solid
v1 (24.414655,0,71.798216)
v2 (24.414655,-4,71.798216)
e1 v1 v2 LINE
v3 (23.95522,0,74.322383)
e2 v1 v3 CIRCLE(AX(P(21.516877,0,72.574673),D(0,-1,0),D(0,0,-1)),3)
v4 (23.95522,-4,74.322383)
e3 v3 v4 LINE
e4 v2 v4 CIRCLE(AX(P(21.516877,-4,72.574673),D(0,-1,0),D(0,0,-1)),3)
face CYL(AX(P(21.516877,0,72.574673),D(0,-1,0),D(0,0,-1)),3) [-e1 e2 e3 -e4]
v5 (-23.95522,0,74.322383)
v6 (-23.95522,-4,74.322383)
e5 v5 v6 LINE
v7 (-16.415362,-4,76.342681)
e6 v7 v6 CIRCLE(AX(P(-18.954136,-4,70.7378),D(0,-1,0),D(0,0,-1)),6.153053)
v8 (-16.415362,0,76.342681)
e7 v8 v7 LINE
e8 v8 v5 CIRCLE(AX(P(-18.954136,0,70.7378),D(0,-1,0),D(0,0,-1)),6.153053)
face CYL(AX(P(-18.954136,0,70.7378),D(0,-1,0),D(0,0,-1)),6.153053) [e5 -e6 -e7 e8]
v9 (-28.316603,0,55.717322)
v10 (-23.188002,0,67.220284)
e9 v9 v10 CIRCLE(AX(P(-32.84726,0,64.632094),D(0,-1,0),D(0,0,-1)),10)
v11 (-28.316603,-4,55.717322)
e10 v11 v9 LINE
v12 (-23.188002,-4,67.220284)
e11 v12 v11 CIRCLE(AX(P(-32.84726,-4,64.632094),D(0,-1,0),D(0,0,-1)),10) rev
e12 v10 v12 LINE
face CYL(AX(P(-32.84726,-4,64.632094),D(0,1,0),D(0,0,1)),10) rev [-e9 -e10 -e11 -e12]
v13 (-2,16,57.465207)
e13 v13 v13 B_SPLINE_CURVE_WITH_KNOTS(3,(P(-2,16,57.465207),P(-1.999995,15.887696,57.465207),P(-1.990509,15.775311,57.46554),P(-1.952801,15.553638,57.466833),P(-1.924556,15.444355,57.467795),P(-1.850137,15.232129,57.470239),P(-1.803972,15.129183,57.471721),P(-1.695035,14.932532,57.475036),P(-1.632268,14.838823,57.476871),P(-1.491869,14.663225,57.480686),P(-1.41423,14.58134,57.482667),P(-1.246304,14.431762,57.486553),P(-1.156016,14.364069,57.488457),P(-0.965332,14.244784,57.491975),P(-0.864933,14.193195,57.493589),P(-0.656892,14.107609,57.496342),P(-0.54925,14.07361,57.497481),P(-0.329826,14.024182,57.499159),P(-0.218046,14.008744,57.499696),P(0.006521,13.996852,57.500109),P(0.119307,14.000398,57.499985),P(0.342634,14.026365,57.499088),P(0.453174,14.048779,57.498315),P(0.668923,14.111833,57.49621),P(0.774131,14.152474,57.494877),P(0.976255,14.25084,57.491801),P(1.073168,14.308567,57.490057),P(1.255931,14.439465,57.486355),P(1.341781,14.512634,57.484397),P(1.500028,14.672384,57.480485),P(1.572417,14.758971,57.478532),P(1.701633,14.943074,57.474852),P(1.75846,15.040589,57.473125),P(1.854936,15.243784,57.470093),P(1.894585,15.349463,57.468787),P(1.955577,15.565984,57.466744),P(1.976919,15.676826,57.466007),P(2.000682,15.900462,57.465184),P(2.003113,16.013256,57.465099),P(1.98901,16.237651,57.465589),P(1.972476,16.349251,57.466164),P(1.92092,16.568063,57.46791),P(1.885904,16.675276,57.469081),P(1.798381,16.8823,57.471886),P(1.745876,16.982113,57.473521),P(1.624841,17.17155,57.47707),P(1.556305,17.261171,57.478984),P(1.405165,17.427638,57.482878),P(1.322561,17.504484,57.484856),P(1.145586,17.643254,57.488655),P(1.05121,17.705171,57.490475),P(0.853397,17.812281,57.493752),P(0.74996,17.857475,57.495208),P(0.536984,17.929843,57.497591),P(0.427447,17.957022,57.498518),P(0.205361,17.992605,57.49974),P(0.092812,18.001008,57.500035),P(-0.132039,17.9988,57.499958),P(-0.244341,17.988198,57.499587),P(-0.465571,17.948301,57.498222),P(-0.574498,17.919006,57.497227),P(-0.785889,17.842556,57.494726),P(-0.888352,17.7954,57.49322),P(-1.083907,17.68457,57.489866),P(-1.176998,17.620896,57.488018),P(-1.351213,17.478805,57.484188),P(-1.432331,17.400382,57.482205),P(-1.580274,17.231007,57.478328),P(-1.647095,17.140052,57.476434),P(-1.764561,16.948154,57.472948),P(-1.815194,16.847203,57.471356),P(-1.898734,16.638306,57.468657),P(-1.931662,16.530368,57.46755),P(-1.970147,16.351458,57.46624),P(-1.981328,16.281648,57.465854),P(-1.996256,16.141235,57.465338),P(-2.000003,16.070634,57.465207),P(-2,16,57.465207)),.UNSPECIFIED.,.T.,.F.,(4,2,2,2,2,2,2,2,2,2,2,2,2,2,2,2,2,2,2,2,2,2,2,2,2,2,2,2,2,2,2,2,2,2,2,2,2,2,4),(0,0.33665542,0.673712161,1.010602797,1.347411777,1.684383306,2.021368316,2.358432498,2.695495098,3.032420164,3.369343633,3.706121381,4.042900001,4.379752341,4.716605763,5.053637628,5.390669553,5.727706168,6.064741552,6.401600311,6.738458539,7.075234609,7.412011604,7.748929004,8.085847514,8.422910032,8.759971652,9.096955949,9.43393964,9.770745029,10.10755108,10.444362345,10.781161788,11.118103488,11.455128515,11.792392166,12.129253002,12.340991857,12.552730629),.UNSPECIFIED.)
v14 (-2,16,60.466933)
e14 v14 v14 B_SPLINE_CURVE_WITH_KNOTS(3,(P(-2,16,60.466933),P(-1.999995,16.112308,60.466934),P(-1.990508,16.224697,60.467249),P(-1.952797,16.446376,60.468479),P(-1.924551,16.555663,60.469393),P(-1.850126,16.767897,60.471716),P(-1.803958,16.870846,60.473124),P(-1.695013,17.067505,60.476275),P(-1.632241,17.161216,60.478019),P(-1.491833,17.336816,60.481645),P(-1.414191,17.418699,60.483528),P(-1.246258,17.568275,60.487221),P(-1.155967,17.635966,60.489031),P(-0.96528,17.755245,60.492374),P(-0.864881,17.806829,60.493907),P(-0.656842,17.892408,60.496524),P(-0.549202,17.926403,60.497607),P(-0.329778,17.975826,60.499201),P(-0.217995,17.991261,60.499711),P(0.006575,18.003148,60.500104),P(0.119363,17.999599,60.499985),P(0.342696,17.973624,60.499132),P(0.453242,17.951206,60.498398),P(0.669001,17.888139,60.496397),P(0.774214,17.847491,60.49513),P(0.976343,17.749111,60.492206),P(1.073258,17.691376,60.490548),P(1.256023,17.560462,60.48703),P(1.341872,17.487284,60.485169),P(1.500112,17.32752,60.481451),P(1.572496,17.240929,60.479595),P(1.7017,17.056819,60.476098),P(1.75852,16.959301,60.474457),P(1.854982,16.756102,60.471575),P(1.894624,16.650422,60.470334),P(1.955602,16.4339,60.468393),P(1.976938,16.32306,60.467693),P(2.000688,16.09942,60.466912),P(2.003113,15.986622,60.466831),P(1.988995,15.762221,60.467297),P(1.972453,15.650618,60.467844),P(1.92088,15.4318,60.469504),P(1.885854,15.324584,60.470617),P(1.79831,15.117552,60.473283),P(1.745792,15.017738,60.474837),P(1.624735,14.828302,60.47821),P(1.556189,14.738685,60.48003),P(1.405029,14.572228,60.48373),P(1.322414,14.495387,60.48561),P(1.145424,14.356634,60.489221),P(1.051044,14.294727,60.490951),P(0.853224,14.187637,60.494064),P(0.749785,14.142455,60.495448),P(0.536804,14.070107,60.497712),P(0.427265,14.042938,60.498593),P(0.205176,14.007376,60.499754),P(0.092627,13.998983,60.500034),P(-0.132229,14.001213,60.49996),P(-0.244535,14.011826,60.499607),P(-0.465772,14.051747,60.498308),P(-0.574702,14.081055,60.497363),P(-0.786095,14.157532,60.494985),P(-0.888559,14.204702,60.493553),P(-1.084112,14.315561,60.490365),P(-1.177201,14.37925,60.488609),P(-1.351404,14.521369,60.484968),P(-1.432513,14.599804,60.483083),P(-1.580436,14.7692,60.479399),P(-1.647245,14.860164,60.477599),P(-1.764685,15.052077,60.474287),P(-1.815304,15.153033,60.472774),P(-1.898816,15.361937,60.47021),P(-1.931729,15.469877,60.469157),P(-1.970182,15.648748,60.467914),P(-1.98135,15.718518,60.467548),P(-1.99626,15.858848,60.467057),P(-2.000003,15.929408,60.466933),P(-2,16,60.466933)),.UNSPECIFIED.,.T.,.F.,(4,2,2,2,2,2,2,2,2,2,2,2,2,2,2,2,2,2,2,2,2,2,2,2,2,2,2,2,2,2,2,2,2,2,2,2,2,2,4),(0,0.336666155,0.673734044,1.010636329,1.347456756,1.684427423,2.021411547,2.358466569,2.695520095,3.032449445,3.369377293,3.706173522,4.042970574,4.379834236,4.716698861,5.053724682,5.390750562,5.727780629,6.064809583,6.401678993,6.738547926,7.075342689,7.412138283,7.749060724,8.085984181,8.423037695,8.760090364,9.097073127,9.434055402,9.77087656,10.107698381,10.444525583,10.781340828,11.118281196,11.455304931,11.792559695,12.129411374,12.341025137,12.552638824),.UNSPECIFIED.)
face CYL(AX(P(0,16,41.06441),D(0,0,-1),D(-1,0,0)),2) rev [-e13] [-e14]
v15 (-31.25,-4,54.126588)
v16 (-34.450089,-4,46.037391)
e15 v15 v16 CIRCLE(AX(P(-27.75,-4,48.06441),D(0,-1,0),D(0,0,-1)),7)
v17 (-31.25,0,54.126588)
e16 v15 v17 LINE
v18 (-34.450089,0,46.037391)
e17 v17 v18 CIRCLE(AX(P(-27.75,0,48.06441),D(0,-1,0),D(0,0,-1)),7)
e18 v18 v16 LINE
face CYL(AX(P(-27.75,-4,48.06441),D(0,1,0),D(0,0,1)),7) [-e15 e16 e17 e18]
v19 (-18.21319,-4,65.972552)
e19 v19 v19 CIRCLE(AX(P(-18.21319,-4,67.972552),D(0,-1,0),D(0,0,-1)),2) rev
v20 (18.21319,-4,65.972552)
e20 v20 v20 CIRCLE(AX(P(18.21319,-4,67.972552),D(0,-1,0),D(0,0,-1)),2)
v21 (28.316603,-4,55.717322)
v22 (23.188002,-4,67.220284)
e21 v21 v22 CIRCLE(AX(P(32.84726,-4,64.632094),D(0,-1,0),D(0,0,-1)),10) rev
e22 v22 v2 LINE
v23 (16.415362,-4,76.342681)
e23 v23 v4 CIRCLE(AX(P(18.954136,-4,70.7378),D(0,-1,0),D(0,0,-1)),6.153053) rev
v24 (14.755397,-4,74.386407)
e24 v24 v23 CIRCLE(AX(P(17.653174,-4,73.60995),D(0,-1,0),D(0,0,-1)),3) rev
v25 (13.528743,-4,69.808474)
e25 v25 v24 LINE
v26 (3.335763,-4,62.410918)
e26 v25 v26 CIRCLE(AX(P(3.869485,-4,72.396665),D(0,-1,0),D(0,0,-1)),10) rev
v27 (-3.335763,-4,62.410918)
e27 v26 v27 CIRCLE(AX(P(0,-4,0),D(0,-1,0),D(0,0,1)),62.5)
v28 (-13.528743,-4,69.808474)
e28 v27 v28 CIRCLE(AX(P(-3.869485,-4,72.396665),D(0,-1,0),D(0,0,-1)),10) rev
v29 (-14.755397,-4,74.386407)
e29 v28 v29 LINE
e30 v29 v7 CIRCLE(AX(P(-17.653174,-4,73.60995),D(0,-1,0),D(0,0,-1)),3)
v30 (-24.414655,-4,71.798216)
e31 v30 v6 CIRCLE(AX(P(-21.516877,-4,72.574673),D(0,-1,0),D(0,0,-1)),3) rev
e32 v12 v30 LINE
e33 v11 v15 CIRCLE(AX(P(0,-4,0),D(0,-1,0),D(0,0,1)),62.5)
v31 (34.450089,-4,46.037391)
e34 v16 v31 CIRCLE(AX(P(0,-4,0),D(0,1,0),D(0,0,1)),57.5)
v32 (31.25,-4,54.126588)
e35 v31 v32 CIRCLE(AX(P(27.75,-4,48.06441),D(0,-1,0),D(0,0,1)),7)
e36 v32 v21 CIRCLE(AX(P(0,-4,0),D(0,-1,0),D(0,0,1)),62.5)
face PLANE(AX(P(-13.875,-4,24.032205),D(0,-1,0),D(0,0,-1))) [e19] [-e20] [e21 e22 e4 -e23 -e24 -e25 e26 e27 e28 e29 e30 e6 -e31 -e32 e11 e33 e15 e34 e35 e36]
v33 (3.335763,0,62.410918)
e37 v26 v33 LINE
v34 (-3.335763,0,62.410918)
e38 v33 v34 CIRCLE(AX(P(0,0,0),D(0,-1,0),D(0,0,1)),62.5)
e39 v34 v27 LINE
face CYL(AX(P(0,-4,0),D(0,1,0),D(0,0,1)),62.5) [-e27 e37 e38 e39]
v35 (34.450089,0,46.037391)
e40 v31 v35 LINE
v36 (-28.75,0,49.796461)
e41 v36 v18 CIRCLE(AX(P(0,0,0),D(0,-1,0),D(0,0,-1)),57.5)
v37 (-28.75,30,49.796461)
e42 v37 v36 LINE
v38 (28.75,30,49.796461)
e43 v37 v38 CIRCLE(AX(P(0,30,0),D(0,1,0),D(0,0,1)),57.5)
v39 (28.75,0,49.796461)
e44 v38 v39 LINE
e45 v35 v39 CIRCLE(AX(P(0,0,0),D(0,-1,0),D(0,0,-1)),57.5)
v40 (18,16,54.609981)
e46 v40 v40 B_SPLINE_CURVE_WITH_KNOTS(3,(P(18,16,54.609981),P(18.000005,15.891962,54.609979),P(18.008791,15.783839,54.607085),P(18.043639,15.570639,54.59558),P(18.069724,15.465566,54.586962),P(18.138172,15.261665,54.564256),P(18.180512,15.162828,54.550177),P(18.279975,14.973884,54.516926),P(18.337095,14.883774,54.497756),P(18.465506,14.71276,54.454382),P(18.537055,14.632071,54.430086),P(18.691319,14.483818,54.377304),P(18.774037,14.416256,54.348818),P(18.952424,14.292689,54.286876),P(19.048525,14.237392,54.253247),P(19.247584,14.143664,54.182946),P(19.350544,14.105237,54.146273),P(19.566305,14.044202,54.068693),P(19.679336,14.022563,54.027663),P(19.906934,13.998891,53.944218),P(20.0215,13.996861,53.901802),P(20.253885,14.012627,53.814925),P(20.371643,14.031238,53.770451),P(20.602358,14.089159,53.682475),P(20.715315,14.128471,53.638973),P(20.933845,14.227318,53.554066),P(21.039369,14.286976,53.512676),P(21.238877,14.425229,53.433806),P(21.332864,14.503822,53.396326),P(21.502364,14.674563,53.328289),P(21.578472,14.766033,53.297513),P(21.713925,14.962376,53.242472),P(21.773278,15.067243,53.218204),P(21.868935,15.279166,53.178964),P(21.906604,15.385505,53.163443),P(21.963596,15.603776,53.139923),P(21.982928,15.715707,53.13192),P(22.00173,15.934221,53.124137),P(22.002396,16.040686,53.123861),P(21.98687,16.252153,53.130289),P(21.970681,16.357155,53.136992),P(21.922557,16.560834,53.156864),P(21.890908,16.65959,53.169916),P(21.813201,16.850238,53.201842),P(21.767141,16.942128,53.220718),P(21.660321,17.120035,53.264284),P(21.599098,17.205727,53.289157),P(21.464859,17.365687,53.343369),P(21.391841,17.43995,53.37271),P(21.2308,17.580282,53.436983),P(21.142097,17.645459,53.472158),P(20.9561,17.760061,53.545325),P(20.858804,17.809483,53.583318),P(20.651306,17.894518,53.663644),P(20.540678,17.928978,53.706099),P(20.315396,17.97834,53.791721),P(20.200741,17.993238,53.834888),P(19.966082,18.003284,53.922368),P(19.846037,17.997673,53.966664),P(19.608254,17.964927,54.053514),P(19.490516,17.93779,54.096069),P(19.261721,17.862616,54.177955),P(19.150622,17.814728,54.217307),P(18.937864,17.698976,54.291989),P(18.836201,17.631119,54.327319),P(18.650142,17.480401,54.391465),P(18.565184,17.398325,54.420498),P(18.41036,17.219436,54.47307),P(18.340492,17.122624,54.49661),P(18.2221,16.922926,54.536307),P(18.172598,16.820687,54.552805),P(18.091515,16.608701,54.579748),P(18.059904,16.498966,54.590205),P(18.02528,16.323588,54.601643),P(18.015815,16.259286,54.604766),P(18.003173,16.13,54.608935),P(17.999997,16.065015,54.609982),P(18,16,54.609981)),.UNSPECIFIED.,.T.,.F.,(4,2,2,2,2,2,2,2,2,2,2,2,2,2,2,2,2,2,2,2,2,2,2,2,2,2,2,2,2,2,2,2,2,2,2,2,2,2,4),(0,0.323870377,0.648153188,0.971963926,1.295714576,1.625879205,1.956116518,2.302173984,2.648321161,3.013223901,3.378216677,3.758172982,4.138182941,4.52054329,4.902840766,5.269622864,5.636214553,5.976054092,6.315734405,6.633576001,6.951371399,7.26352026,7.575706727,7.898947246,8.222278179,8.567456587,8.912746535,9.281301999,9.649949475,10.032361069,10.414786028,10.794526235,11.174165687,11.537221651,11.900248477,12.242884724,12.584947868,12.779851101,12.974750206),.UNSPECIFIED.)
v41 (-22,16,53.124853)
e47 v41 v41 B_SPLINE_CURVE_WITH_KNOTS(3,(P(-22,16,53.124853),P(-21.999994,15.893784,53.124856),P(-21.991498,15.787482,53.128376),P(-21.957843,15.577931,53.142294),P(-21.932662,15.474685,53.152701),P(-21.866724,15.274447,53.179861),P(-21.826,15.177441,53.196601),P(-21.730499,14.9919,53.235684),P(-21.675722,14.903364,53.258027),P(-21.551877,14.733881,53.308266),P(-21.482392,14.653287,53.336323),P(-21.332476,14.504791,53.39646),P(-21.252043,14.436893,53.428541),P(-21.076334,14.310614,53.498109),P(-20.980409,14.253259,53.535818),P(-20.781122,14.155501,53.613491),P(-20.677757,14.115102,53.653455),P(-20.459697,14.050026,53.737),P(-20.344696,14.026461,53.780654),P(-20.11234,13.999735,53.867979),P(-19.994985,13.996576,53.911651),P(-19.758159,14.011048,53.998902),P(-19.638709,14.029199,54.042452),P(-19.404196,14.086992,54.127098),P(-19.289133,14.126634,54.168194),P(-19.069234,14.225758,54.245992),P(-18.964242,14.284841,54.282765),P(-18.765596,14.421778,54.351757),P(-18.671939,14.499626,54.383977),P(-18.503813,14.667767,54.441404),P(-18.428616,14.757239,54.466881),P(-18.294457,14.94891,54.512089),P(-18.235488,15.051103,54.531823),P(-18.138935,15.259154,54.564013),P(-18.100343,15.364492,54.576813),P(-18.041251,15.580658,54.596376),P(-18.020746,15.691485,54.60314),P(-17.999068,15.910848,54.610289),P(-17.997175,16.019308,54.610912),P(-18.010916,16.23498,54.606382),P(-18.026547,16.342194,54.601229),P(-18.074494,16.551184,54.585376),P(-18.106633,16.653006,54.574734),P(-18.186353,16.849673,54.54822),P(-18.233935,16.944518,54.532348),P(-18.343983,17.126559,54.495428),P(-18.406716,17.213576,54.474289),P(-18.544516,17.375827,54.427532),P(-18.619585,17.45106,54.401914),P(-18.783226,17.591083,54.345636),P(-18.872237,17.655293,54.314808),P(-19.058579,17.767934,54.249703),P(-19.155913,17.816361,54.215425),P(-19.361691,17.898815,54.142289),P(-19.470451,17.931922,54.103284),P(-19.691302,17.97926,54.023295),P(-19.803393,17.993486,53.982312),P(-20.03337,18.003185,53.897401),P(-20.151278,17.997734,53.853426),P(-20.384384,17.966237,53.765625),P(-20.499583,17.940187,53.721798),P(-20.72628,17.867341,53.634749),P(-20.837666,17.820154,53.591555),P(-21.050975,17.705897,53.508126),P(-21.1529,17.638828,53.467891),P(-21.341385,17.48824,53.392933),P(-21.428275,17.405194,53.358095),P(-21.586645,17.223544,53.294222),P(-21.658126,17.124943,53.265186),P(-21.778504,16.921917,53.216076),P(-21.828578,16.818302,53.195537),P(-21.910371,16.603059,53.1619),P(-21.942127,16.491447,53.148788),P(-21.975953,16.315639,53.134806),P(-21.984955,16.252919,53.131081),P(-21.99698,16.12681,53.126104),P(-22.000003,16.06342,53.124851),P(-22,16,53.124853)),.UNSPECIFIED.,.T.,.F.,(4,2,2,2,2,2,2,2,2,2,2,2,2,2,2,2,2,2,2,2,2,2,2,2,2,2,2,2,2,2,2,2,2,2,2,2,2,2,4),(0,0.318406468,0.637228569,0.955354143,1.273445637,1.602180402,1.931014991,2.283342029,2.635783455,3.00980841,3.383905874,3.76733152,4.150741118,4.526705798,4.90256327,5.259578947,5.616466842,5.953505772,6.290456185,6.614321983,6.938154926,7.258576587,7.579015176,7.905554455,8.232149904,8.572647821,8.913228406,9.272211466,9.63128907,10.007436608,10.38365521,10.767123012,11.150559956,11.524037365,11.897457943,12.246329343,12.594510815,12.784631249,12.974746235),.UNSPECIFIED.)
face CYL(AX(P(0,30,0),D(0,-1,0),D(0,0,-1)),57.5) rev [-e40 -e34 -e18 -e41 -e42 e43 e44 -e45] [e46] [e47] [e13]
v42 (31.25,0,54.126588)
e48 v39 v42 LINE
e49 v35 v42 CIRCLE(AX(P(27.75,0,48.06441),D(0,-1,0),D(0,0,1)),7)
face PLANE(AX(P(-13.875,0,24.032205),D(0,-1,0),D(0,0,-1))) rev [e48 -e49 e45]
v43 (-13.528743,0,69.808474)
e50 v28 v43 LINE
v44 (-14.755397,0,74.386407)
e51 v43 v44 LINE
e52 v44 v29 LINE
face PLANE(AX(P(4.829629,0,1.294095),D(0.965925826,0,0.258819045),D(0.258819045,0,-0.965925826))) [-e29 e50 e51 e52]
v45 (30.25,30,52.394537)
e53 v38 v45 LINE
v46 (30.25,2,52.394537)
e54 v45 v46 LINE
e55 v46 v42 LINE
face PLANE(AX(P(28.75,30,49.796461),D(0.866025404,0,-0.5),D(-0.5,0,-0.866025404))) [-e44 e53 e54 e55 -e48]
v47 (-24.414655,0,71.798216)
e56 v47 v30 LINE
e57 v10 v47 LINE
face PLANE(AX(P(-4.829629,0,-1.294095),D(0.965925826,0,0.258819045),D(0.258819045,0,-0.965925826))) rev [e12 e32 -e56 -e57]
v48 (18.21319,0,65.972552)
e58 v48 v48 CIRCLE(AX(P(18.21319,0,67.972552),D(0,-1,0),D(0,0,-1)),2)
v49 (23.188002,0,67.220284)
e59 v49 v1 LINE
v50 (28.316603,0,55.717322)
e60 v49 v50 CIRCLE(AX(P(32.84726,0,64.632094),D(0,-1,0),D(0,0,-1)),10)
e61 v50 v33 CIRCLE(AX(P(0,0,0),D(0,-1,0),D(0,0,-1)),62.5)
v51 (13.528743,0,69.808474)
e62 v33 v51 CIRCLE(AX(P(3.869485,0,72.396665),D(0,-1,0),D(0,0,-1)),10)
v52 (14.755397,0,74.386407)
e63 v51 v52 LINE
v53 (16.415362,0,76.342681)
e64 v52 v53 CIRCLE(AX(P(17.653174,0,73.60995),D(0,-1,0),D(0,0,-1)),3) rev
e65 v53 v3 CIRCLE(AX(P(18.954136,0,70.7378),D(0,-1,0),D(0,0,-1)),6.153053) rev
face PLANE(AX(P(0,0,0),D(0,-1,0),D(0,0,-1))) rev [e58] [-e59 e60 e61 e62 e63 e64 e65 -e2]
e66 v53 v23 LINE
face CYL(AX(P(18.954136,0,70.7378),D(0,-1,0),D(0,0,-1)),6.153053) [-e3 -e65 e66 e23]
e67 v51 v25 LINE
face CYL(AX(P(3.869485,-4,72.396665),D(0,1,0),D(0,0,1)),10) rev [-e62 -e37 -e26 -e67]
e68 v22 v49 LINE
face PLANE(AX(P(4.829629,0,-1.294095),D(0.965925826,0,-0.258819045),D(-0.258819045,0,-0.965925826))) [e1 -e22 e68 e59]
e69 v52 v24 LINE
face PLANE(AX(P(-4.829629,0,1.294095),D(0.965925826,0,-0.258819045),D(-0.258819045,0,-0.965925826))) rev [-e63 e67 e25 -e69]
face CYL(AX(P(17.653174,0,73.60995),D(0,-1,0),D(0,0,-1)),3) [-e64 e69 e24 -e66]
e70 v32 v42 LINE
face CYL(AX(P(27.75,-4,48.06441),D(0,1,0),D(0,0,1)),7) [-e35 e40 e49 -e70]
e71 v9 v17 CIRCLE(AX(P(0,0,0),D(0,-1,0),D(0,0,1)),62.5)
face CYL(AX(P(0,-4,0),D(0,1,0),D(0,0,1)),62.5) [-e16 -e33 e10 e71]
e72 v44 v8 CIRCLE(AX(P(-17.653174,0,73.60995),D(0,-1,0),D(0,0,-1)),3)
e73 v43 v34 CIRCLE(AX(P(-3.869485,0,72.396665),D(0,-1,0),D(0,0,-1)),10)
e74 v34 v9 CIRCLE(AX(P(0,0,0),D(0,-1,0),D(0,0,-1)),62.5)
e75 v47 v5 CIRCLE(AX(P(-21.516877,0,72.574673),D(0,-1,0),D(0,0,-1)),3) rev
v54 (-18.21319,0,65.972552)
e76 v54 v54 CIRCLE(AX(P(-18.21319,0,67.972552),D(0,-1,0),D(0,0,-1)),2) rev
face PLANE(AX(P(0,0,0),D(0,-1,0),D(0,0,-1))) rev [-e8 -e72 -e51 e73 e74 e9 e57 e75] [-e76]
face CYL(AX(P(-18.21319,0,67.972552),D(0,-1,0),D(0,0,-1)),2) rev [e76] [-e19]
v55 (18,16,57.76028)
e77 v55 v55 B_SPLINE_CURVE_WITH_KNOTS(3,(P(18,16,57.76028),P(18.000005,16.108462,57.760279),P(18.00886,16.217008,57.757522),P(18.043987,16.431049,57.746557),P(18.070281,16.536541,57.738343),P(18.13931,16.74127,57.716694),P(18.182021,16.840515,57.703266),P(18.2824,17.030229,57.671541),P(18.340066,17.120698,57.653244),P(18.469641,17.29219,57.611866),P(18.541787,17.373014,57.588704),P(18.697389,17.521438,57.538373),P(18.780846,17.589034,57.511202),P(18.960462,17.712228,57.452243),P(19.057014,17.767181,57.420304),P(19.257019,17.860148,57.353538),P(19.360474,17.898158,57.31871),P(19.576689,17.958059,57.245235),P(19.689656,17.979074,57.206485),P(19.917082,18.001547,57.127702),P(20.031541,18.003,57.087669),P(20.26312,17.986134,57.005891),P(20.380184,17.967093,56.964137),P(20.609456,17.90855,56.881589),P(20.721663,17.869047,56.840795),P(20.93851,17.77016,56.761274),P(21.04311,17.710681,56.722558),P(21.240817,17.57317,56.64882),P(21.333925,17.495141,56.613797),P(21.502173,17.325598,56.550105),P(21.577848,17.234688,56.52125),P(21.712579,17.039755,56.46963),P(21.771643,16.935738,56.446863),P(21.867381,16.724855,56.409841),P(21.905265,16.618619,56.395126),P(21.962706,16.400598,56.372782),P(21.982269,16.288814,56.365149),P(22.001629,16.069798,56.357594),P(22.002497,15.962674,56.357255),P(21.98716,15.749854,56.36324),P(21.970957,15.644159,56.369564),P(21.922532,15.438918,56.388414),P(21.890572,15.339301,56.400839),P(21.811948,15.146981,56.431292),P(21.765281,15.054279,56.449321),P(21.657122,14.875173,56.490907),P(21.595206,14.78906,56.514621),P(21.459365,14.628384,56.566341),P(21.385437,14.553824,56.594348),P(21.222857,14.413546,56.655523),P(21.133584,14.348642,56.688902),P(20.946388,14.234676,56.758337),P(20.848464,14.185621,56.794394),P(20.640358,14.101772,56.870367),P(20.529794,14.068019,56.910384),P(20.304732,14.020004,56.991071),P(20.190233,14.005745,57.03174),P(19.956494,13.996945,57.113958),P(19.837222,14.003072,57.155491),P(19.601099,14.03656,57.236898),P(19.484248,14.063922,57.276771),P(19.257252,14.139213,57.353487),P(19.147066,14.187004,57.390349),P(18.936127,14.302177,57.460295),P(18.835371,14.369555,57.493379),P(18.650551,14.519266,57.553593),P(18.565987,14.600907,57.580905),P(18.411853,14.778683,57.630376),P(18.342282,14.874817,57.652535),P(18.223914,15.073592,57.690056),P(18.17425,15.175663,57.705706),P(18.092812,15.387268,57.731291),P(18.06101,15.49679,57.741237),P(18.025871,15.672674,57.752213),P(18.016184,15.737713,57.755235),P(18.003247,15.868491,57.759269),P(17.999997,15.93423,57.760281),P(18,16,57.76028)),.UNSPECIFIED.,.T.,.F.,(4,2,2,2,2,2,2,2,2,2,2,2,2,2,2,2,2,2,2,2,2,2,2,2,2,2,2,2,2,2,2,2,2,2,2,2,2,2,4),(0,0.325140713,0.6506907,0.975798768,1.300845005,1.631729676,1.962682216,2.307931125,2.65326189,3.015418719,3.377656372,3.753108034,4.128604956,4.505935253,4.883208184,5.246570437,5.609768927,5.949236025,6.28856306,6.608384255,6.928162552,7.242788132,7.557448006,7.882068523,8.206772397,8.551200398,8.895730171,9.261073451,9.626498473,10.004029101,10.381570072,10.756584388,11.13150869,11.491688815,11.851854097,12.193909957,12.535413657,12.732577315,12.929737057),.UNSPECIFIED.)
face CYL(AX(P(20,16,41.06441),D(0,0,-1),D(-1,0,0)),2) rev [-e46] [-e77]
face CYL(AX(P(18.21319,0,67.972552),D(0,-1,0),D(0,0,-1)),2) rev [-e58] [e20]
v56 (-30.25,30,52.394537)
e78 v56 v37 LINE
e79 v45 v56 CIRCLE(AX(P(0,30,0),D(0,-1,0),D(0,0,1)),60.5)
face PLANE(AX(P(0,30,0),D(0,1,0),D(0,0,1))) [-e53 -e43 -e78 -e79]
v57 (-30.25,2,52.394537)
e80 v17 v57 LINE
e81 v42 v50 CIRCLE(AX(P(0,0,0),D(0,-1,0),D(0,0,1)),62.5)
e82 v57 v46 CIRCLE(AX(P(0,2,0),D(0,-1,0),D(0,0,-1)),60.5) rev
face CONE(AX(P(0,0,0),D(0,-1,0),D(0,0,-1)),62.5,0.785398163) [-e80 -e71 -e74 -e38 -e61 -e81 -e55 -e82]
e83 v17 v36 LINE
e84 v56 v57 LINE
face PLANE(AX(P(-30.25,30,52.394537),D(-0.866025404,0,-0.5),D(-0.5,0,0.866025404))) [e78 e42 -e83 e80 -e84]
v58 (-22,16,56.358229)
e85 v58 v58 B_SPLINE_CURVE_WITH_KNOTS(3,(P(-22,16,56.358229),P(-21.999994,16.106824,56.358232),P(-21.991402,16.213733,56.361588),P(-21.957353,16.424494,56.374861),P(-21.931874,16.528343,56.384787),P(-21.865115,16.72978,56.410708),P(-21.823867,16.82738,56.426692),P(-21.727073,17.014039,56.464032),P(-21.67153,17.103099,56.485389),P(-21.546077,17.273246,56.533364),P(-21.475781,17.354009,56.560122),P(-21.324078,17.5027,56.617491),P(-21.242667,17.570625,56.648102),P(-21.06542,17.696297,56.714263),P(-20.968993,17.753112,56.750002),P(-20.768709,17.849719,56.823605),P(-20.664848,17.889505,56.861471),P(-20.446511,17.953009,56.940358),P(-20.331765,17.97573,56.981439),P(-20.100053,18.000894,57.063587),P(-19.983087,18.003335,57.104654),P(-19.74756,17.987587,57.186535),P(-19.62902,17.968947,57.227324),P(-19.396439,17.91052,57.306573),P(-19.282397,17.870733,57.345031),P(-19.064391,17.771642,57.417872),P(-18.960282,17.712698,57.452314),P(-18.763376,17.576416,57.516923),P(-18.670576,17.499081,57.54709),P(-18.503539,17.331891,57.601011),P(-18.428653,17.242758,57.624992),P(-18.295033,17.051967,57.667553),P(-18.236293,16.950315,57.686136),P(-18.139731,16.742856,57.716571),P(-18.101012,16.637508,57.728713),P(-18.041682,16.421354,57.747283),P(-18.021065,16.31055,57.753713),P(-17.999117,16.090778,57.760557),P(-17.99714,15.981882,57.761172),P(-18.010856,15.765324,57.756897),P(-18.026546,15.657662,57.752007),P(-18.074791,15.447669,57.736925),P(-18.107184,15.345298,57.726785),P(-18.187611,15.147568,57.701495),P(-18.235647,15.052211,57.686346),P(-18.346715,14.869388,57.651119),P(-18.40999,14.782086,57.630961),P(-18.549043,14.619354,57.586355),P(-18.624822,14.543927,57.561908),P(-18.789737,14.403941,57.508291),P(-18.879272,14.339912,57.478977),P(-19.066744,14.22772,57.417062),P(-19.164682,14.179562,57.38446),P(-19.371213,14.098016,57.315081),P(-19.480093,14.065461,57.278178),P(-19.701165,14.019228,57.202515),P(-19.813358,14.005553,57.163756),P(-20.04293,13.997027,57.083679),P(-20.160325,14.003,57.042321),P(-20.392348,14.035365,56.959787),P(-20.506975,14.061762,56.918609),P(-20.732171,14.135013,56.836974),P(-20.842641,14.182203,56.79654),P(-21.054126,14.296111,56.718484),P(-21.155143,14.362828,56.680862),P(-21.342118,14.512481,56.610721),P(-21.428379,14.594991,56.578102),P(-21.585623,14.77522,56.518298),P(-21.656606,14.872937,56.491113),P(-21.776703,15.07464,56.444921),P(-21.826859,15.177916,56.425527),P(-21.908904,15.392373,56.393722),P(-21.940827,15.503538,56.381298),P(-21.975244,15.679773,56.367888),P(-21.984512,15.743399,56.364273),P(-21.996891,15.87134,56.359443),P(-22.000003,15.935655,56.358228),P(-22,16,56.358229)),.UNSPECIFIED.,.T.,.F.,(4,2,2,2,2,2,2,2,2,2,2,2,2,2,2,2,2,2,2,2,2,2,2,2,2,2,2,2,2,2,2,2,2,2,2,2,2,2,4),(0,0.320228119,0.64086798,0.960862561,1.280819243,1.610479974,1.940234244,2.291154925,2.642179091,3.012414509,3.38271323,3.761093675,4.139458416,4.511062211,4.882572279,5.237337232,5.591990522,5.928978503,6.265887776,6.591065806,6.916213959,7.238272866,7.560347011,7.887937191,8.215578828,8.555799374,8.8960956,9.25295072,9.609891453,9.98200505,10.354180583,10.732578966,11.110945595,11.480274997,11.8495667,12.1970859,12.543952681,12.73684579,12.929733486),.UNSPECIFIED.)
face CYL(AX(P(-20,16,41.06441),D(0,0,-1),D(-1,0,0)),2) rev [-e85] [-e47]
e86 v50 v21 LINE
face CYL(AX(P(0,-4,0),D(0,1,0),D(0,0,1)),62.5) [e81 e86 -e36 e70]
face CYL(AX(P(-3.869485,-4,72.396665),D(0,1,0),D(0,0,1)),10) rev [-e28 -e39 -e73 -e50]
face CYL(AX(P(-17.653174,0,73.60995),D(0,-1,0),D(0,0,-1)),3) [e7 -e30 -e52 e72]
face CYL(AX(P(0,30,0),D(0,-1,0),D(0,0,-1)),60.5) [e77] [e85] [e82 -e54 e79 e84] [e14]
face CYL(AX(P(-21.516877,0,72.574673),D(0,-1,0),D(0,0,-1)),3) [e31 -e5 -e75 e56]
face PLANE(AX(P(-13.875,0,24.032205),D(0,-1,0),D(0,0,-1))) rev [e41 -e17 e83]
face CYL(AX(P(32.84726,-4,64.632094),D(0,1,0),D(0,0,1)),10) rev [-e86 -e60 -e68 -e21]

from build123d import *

# Parameters (mm, degrees)
BOSS_EXTRUDE1_DEPTH     = 10
BOSS_EXTRUDE2_DEPTH     = 30
BOSS_EXTRUDE3_DEPTH     = 4
CHAMFER1_SIZE           = 2
CUT_EXTRUDE1_DEPTH      = 78.548774974
CUT_EXTRUDE1_DEPTH_BACK = 78.548774974
SKETCH5_R               = 2
BOSS_EXTRUDE4_START     = -4
SKETCH6_R               = 2
BOSS_EXTRUDE4_DEPTH     = 4
FILLET1_R               = 10
CUT_EXTRUDE2_DEPTH      = 90.553145411
CUT_EXTRUDE2_DEPTH_BACK = 90.553145411
SKETCH7_R               = 57.5


with BuildPart() as part:
    # Sketch1 → Boss-Extrude1 (new body)
    with BuildSketch(Plane(origin=(0, 0, 0), x_dir=(1, 0, 0), z_dir=(0, 1, 0))):
        with BuildLine():
            ThreePointArc((-25.25, -43.734282891), (0, -50.5), (25.25, -43.734282891))
            Line((25.25, -43.734282891), (27.25, -47.198384506))
            ThreePointArc((27.25, -47.198384506), (0, -54.5), (-27.25, -47.198384506))
            Line((-27.25, -47.198384506), (-25.25, -43.734282891))
        make_face()
    extrude(amount=BOSS_EXTRUDE1_DEPTH)



with BuildPart() as body_2:
    # Sketch3 → Boss-Extrude2 (new body)
    with BuildSketch(Plane.XZ):
        with BuildLine():
            Line((-30.25, 52.394536929), (-28.75, 49.796460718))
            ThreePointArc((-28.75, 49.796460718), (0, 57.5), (28.75, 49.796460718))
            Line((28.75, 49.796460718), (30.25, 52.394536929))
            ThreePointArc((30.25, 52.394536929), (0, 60.5), (-30.25, 52.394536929))
        make_face()
    extrude(amount=-BOSS_EXTRUDE2_DEPTH)


with BuildPart() as part_1:
    add(part.part)

    add(body_2.part)  # Boss-Extrude3 merges body 2
    # Sketch4 → Boss-Extrude3 (add)
    with BuildSketch(Plane.XZ):
        with BuildLine():
            ThreePointArc((-24.25, 42.002232084), (0, 48.5), (24.25, 42.002232084))
            ThreePointArc((24.25, 42.002232084), (33.812177826, 44.56440991), (31.25, 54.126587737))
            ThreePointArc((31.25, 54.126587737), (0, 62.5), (-31.25, 54.126587737))
            ThreePointArc((-31.25, 54.126587737), (-33.812177826, 44.56440991), (-24.25, 42.002232084))
        make_face()
    extrude(amount=BOSS_EXTRUDE3_DEPTH)

    # Chamfer1
    chamfer1_edges = [part_1.edges().sort_by_distance(p)[0] for p in [
        (0, 0, 60.5),
        (0, 0, 50.5),
    ]]
    chamfer(chamfer1_edges, length=CHAMFER1_SIZE - 0.0001)  # a hair under: the kernel refuses the full size

    # Sketch5 → Cut-Extrude1 (cut, two sides: drawn at the far end of the back side and taken through both)
    with BuildSketch(Plane.XY.offset(-CUT_EXTRUDE1_DEPTH_BACK)):
        with Locations(Location((0, 16, 0), (0, 0, 180))):
            Circle(SKETCH5_R)
        with Locations(Location((-20, 16, 0), (0, 0, 180))):
            Circle(SKETCH5_R)
        with Locations(Location((20, 16, 0), (0, 0, 180))):
            Circle(SKETCH5_R)
    extrude(amount=CUT_EXTRUDE1_DEPTH + CUT_EXTRUDE1_DEPTH_BACK, mode=Mode.SUBTRACT)

    # Sketch6 → Boss-Extrude4 (add)
    # profile 1 of 2: a face of its own
    with BuildSketch(Plane.XZ.offset(4).offset(BOSS_EXTRUDE4_START)):
        with BuildLine():
            Line((20.953972553, 58.882773663), (24.414654978, 71.798216302))
            ThreePointArc((24.414654978, 71.798216302), (24.468385119, 73.111891055), (23.955219754, 74.322382523))
            ThreePointArc((23.955219754, 74.322382523), (20.546663808, 76.681193258), (16.415362401, 76.342681212))
            ThreePointArc((16.415362401, 76.342681212), (15.365702425, 75.550947532), (14.755396715, 74.386406753))
            Line((14.755396715, 74.386406753), (11.29471429, 61.470964114))
            ThreePointArc((11.29471429, 61.470964114), (16.176190319, 60.370364143), (20.953972553, 58.882773663))
        make_face()
        with Locations(Location((18.213190451, 67.972552131, 0), (0, 0, 270))):
            Circle(SKETCH6_R, mode=Mode.SUBTRACT)
    # profile 2 of 2: a face of its own
    with BuildSketch(Plane.XZ.offset(4).offset(BOSS_EXTRUDE4_START)):
        with BuildLine():
            Line((-20.953972553, 58.882773663), (-24.414654978, 71.798216302))
            ThreePointArc((-24.414654978, 71.798216302), (-24.468385119, 73.111891055), (-23.955219754, 74.322382523))
            ThreePointArc((-23.955219754, 74.322382523), (-20.546663808, 76.681193258), (-16.415362401, 76.342681212))
            ThreePointArc((-16.415362401, 76.342681212), (-15.365702425, 75.550947532), (-14.755396715, 74.386406753))
            Line((-14.755396715, 74.386406753), (-11.29471429, 61.470964114))
            ThreePointArc((-11.29471429, 61.470964114), (-16.176190319, 60.370364143), (-20.953972553, 58.882773663))
        make_face()
        with Locations(Location((-18.213190451, 67.972552131, 0), (0, 0, 270))):
            Circle(SKETCH6_R, mode=Mode.SUBTRACT)
    extrude(amount=BOSS_EXTRUDE4_DEPTH)

    # Fillet1
    fillet1_edges = [part_1.edges().sort_by_distance(p)[0] for p in [
        (-11.29471429, -2, 61.470964114),
        (-20.953972553, -2, 58.882773663),
        (20.953972553, -2, 58.882773663),
        (11.29471429, -2, 61.470964114),
    ]]
    fillet(fillet1_edges, radius=FILLET1_R)

    # Sketch7 → Cut-Extrude2 (cut, two sides: drawn at the far end of the back side and taken through both)
    with BuildSketch(Plane(origin=(0, 0, 0), x_dir=(1, 0, 0), z_dir=(0, 1, 0)).offset(-CUT_EXTRUDE2_DEPTH_BACK)):
        Circle(SKETCH7_R)
    extrude(amount=CUT_EXTRUDE2_DEPTH + CUT_EXTRUDE2_DEPTH_BACK, mode=Mode.SUBTRACT)


solid = part_1.part
